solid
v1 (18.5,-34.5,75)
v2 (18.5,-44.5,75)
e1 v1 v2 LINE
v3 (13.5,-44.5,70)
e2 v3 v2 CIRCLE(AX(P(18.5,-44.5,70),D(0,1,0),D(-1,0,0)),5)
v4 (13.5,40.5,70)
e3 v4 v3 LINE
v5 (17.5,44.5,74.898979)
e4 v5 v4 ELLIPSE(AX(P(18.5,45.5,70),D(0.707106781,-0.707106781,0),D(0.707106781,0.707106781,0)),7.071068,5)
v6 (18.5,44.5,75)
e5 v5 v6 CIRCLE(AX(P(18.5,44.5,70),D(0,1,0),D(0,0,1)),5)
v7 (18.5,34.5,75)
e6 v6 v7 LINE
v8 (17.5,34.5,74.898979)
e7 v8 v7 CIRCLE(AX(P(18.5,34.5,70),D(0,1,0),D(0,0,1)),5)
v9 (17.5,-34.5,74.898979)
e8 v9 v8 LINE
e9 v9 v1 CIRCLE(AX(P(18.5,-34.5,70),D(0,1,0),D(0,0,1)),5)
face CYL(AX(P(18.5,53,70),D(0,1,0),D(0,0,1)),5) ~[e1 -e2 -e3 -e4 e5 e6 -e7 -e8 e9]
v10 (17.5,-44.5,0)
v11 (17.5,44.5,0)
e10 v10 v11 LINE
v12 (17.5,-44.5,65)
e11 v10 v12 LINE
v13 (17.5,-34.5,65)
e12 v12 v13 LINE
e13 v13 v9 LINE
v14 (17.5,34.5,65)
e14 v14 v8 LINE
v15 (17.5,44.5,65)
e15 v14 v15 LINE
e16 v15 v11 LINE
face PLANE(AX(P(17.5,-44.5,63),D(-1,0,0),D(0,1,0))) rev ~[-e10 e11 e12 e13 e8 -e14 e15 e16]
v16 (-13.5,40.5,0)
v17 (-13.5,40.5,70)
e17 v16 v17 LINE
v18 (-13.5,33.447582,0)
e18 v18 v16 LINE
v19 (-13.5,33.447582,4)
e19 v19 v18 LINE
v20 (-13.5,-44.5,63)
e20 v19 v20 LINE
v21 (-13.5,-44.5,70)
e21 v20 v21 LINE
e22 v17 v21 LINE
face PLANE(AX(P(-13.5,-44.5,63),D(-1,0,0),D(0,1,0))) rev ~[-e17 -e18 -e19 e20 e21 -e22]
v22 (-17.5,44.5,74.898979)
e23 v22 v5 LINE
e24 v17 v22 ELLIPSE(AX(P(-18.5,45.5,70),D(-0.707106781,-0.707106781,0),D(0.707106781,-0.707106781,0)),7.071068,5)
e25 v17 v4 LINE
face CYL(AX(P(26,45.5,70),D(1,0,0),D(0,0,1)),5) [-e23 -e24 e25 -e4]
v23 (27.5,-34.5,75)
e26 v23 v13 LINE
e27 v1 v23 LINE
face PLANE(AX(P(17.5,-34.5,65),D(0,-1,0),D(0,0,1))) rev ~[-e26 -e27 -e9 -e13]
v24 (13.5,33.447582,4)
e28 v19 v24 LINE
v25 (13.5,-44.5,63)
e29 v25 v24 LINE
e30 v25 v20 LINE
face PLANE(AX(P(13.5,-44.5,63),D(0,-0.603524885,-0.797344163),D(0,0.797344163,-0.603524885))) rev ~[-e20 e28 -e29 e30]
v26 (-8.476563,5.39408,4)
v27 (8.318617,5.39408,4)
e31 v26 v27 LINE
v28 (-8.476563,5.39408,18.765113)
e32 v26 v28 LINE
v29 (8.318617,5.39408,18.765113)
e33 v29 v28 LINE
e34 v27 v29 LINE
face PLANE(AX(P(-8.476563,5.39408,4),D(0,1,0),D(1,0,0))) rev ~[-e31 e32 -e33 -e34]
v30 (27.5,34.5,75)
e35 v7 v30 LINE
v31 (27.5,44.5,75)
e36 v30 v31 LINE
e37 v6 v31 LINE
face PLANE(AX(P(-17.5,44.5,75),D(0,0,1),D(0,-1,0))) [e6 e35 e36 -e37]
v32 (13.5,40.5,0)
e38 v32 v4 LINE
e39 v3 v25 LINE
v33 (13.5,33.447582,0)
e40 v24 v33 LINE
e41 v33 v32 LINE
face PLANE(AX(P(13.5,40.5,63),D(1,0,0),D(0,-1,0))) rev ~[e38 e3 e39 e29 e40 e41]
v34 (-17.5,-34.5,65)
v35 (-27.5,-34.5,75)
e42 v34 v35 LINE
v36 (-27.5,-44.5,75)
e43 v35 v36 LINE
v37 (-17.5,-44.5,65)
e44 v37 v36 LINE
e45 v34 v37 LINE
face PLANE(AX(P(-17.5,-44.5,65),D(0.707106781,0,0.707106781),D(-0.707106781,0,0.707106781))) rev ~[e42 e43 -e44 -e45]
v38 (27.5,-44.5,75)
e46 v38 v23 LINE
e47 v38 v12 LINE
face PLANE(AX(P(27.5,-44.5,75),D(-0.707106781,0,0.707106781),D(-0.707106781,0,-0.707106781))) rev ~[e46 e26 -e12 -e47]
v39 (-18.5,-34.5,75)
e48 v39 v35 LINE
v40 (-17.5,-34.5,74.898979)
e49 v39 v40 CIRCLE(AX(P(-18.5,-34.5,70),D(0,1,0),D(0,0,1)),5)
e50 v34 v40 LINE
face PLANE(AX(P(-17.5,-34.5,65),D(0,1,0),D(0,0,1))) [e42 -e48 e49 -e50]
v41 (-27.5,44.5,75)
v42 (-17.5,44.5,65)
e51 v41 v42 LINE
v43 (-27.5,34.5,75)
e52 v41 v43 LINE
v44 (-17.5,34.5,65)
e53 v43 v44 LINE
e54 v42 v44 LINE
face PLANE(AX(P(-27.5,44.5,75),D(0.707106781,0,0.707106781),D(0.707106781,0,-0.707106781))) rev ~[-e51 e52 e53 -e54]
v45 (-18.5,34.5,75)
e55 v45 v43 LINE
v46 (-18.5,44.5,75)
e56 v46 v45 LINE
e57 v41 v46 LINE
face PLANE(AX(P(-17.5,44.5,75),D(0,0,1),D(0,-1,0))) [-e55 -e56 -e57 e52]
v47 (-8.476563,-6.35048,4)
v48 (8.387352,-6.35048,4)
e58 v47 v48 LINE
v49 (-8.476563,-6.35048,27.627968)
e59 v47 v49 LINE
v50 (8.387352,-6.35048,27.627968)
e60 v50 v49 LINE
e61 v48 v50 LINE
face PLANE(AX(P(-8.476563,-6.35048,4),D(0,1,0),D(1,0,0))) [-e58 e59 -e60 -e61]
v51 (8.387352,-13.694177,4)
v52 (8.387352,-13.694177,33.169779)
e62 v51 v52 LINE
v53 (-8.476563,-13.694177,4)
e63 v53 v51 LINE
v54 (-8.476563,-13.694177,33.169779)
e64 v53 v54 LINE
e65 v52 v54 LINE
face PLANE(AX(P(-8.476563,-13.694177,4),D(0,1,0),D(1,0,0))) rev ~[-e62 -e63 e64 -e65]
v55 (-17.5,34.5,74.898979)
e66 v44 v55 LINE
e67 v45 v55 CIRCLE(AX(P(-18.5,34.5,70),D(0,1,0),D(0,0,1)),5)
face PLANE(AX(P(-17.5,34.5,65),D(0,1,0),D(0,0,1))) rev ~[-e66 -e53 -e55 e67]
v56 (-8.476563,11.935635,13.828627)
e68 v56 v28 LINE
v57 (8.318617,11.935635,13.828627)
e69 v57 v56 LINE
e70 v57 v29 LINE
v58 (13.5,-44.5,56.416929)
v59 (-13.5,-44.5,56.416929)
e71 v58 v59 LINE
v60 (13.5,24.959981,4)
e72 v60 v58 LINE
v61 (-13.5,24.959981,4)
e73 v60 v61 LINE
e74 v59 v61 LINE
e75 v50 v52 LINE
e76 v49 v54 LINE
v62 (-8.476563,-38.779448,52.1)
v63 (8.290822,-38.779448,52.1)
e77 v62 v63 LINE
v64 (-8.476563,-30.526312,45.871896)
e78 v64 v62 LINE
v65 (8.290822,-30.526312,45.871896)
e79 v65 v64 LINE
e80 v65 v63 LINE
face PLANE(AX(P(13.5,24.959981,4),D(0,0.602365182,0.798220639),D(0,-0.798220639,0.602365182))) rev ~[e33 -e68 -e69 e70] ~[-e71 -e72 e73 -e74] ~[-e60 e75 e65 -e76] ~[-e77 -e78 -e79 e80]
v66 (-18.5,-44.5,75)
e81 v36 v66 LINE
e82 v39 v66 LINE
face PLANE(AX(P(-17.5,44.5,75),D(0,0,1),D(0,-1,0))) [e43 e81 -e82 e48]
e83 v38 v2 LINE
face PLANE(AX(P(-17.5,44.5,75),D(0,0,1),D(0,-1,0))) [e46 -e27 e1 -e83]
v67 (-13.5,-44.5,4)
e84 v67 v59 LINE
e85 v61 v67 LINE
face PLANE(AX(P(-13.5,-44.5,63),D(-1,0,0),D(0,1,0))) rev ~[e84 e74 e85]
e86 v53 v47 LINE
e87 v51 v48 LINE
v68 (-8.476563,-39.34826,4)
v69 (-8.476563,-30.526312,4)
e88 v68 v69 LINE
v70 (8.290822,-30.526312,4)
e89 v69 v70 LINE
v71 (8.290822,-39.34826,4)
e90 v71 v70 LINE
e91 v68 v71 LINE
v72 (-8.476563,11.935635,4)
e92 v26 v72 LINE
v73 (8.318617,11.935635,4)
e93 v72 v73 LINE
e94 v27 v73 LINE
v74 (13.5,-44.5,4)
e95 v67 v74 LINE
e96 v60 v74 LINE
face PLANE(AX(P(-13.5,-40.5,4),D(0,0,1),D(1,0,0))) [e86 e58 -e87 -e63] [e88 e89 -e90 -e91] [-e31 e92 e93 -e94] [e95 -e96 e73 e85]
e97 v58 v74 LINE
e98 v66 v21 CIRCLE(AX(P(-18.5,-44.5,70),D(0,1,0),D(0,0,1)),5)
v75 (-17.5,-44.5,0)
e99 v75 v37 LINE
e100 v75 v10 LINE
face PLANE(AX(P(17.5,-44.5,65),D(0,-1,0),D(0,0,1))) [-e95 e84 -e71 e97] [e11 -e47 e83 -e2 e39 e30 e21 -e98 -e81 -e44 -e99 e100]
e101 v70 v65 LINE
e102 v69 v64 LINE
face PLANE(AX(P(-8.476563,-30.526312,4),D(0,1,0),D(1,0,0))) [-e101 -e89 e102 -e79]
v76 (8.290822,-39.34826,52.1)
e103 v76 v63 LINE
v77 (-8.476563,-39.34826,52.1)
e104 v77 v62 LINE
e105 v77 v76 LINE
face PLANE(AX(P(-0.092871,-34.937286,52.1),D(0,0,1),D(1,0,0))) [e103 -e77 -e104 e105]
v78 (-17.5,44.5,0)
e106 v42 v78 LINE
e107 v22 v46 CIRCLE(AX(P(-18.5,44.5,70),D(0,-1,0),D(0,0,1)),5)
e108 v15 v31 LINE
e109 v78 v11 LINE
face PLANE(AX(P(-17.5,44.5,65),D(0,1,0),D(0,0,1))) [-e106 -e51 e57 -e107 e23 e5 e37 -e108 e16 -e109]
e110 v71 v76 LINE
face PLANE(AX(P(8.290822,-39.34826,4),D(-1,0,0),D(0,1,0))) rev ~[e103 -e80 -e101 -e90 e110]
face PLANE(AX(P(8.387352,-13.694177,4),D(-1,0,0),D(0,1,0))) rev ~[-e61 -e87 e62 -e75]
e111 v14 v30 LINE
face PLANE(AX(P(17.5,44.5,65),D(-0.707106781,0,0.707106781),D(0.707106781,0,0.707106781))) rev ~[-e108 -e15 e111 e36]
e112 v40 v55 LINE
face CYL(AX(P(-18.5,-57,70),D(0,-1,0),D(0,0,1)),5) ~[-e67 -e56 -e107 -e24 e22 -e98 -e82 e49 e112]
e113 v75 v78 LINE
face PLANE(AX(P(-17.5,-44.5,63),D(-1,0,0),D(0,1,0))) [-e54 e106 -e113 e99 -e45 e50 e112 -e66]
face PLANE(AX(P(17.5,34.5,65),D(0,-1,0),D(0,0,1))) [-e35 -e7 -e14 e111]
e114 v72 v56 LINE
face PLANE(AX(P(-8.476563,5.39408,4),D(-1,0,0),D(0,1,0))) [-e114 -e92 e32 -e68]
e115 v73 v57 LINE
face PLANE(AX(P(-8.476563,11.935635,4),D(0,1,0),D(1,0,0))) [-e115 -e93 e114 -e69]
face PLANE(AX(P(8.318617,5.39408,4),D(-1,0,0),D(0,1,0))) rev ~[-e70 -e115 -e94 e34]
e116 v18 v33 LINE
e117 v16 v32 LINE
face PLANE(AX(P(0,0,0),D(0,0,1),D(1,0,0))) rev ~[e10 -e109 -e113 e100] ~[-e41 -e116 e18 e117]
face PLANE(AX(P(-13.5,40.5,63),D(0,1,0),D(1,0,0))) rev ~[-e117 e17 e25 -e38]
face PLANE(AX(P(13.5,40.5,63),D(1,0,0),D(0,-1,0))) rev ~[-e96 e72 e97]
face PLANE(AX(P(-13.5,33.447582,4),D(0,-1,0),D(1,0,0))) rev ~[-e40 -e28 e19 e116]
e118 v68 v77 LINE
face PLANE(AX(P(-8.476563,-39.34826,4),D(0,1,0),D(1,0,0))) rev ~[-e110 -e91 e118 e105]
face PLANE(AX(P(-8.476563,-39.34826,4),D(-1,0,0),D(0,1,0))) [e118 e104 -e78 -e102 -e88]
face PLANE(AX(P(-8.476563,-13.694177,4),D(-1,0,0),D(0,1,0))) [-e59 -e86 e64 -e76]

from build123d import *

# Parameters (mm, degrees)
F0_W          = 35
F0_H          = 89
F1_DEPTH      = 63
F2_T          = -4
F3_W          = 27
F3_H          = 7.0524177253
F4_DEPTH      = 4.3
F5_DEPTH      = 5.2
F7_DEPTH      = 12
F9_DEPTH      = 28.5
F8_W          = 16.7951798066
F8_H          = 6.5415552817
F10_DEPTH     = 15.6
F8_W_2        = 16.8639151379
F8_H_2        = 7.3436973616
F11_DEPTH     = 29.2
F8_W_3        = 16.7673844844
F8_H_3        = 8.8219475001
F12_DEPTH     = 48.1
F13_W         = 10
F13_H         = 10
F14_DEPTH     = 10
F15_W         = 10
F15_H         = 10
F16_DEPTH     = 10
F19_DEPTH     = 10
F20_DEPTH     = 10
F21_T1_DEPTH  = 97.5
F21_T3_DEPTH  = 27
F21_T8_DEPTH  = 94
F21_T13_DEPTH = 110
F21_T18_DEPTH = 110
F21_T23_DEPTH = 94
F21_T29_DEPTH = 97.5
F21_T35_DEPTH = 39.5
F21_T44_DEPTH = 39.5
F21_T50_DEPTH = 97.5


# Not quite as in the source:
# - a fillet or chamfer that OpenCascade refuses, or shapes differently, is made with other operations: its cross-section is extruded or revolved along the edge and cut away or added


with BuildPart() as f1:
    # F0 (on Top) → F1 (new body)
    with BuildSketch(Plane.XY):
        Rectangle(F0_W, F0_H)
    extrude(amount=F1_DEPTH)

    # F2
    f2_openings = [f1.faces().sort_by_distance(p)[0] for p in [
        (0, 0, 63),
    ]]
    offset(amount=F2_T, openings=f2_openings)

    # F3 (on face) → F4 (cut)
    with BuildSketch(Plane.XY.offset(4)):
        with Locations((0, 36.9737911373)):
            Rectangle(F3_W, F3_H)
    extrude(amount=-F4_DEPTH, mode=Mode.SUBTRACT)

    # F5 (cut): a face of the model
    f5_faces = [f1.faces().sort_by_distance(p)[0] for p in [
        (0, -40.5, 33.5),
    ]]
    extrude(f5_faces, amount=-F5_DEPTH, mode=Mode.SUBTRACT)

    # F7 (add): a face of the model
    f7_faces = [f1.faces().sort_by_distance(p)[0] for p in [
        (-16.5436527827, 0, 63),
    ]]
    extrude(f7_faces, amount=F7_DEPTH)

    # F6 (on face) → F9 (join)
    with BuildSketch(Plane(origin=(13.5, 0, 0), x_dir=(0, -1, 0), z_dir=(-1, 0, 0))):
        Polygon((44.5, 63), (-33.4475822747, 4), (-24.9599814415, 4), (44.5, 56.4169287682), align=None)
    extrude(amount=F9_DEPTH)

    # F8 (on face) → F10 (join)
    with BuildSketch(Plane.XY.offset(4)):
        with Locations((-0.0789728947, 8.664857829)):
            Rectangle(F8_W, F8_H)
    extrude(amount=F10_DEPTH)

    # F8 (on face) → F11 (join)
    with BuildSketch(Plane.XY.offset(4)):
        with Locations((-0.044605229, -10.0223287009)):
            Rectangle(F8_W_2, F8_H_2)
    extrude(amount=F11_DEPTH)

    # F8 (on face) → F12 (join)
    with BuildSketch(Plane.XY.offset(4)):
        with Locations((-0.0928705558, -34.9372858182)):
            Rectangle(F8_W_3, F8_H_3)
    extrude(amount=F12_DEPTH)

    # F13 (on face) → F14 (join)
    with BuildSketch(Plane.YZ.offset(17.5)):
        with Locations((-39.5, 70)):
            Rectangle(F13_W, F13_H)
        with Locations((39.5, 70)):
            Rectangle(F13_W, F13_H)
    extrude(amount=F14_DEPTH)

    # F15 (on face) → F16 (join)
    with BuildSketch(Plane(origin=(-17.5, 0, 0), x_dir=(0, -1, 0), z_dir=(-1, 0, 0))):
        with Locations((-39.5, 70)):
            Rectangle(F15_W, F15_H)
        with Locations((39.5, 70)):
            Rectangle(F15_W, F15_H)
    extrude(amount=F16_DEPTH)

    # F18 (on face) → F19 (cut)
    with BuildSketch(Plane.XZ.offset(44.5)):
        Polygon((-17.5, 65), (-27.5, 75), (-27.5, 65), align=None)
        Polygon((27.5, 75), (17.5, 65), (27.5, 65), align=None)
    extrude(amount=-F19_DEPTH, mode=Mode.SUBTRACT)

    # F17 (on face) → F20 (cut)
    with BuildSketch(Plane(origin=(0, 44.5, 0), x_dir=(-1, 0, 0), z_dir=(0, 1, 0))):
        Polygon((-17.5, 65), (-27.5, 75), (-27.5, 65), align=None)
        Polygon((27.5, 65), (27.5, 75), (17.5, 65), align=None)
    extrude(amount=-F20_DEPTH, mode=Mode.SUBTRACT)

    # F21: fillet of radius 5 on 7 edges, made by hand

    # F21_s2 → F21_t1 (cut)
    with BuildSketch(Plane.XZ.offset(-40.5)):
        with BuildLine():
            ThreePointArc((-18.5, 75), (-14.9644660941, 73.5355339059), (-13.5, 70))
            Line((-13.5, 70), (-13.5, 75))
            Line((-13.5, 75), (-18.5, 75))
        make_face()
        with BuildLine():
            ThreePointArc((18.5, 75), (14.9644660941, 73.5355339059), (13.5, 70))
            Line((13.5, 70), (13.5, 75))
            Line((13.5, 75), (18.5, 75))
        make_face()
    extrude(amount=F21_T1_DEPTH, mode=Mode.SUBTRACT)

    # F21_s4 → F21_t3 (cut)
    with BuildSketch(Plane.YZ.offset(-13.5)):
        with BuildLine():
            ThreePointArc((45.5, 75), (41.9644660941, 73.5355339059), (40.5, 70))
            Line((40.5, 70), (40.5, 75))
            Line((40.5, 75), (45.5, 75))
        make_face()
    extrude(amount=F21_T3_DEPTH, mode=Mode.SUBTRACT)


with BuildPart() as f21_tool6:
    # F21_s7 → F21_t8 (new body)
    with BuildSketch(Plane.XZ.offset(-47)):
        with BuildLine():
            ThreePointArc((-12.5, 75), (-16.0355339059, 73.5355339059), (-17.5, 70))
            Line((-17.5, 70), (-17.5, 75))
            Line((-17.5, 75), (-12.5, 75))
        make_face()
    extrude(amount=F21_T8_DEPTH)

    split(bisect_by=Plane.YZ.offset(-13.5), keep=Keep.TOP)


with BuildPart() as f1_1:
    add(f1.part)

    # F21_t5: cut F21_tool6
    add(f21_tool6.part, mode=Mode.SUBTRACT)


with BuildPart() as f21_tool11:
    # F21_s12 → F21_t13 (new body)
    with BuildSketch(Plane.XZ.offset(57)):
        with BuildLine():
            ThreePointArc((-18.5, 75), (-14.9644660941, 73.5355339059), (-13.5, 70))
            Line((-13.5, 70), (-13.5, 75))
            Line((-13.5, 75), (-18.5, 75))
        make_face()
    extrude(amount=-F21_T13_DEPTH)

    split(bisect_by=Plane.YZ.offset(-17.5), keep=Keep.BOTTOM)


with BuildPart() as f1_2:
    add(f1_1.part)

    # F21_t10: cut F21_tool11
    add(f21_tool11.part, mode=Mode.SUBTRACT)


with BuildPart() as f21_tool16:
    # F21_s17 → F21_t18 (new body)
    with BuildSketch(Plane.XZ.offset(-53)):
        with BuildLine():
            ThreePointArc((18.5, 75), (14.9644660941, 73.5355339059), (13.5, 70))
            Line((13.5, 70), (13.5, 75))
            Line((13.5, 75), (18.5, 75))
        make_face()
    extrude(amount=F21_T18_DEPTH)

    split(bisect_by=Plane.YZ.offset(17.5), keep=Keep.TOP)


with BuildPart() as f1_3:
    add(f1_2.part)

    # F21_t15: cut F21_tool16
    add(f21_tool16.part, mode=Mode.SUBTRACT)


with BuildPart() as f21_tool21:
    # F21_s22 → F21_t23 (new body)
    with BuildSketch(Plane.XZ.offset(47)):
        with BuildLine():
            ThreePointArc((17.5, 70), (16.0355339059, 73.5355339059), (12.5, 75))
            Line((12.5, 75), (17.5, 75))
            Line((17.5, 75), (17.5, 70))
        make_face()
    extrude(amount=-F21_T23_DEPTH)

    split(bisect_by=Plane.YZ.offset(13.5), keep=Keep.BOTTOM)


with BuildPart() as f1_4:
    add(f1_3.part)

    # F21_t20: cut F21_tool21
    add(f21_tool21.part, mode=Mode.SUBTRACT)


with BuildPart() as f21_tool27:
    # F21_s28 → F21_t29 (new body)
    with BuildSketch(Plane.XZ.offset(44.5)):
        with BuildLine():
            ThreePointArc((-18.5, 75), (-14.9644660941, 73.5355339059), (-13.5, 70))
            Line((-13.5, 70), (-13.5, 75))
            Line((-13.5, 75), (-18.5, 75))
        make_face()
    extrude(amount=-F21_T29_DEPTH)

    split(bisect_by=Plane.YZ.offset(-17.5), keep=Keep.TOP)

    split(bisect_by=Plane.XZ.offset(-44.5), keep=Keep.TOP)

    split(bisect_by=Plane.XZ.offset(-40.5), keep=Keep.BOTTOM)


with BuildPart() as f21_tool33:
    # F21_s34 → F21_t35 (new body)
    with BuildSketch(Plane.YZ.offset(13.5)):
        with BuildLine():
            ThreePointArc((45.5, 75), (41.9644660941, 73.5355339059), (40.5, 70))
            Line((40.5, 70), (40.5, 75))
            Line((40.5, 75), (45.5, 75))
        make_face()
    extrude(amount=-F21_T35_DEPTH)

    split(bisect_by=Plane.YZ.offset(-13.5), keep=Keep.BOTTOM)

    split(bisect_by=Plane.XZ.offset(-44.5), keep=Keep.TOP)

    split(bisect_by=Plane(origin=(23.75, 0, 23.75), x_dir=(0, 1, 0), z_dir=(0.7071067812, 0, 0.7071067812)), keep=Keep.TOP)


with BuildPart() as f21_tool27_1:
    add(f21_tool27.part)

    # F21_t39: intersect F21_tool33
    add(f21_tool33.part, mode=Mode.INTERSECT)


with BuildPart() as f1_5:
    add(f1_4.part)

    # F21_t25: cut F21_tool27
    add(f21_tool27_1.part, mode=Mode.SUBTRACT)


with BuildPart() as f21_tool42:
    # F21_s43 → F21_t44 (new body)
    with BuildSketch(Plane.YZ.offset(26)):
        with BuildLine():
            ThreePointArc((45.5, 75), (41.9644660941, 73.5355339059), (40.5, 70))
            Line((40.5, 70), (40.5, 75))
            Line((40.5, 75), (45.5, 75))
        make_face()
    extrude(amount=-F21_T44_DEPTH)

    split(bisect_by=Plane.YZ.offset(13.5), keep=Keep.TOP)

    split(bisect_by=Plane.XZ.offset(-44.5), keep=Keep.TOP)

    split(bisect_by=Plane(origin=(-23.75, 0, 23.75), x_dir=(0, 1, 0), z_dir=(-0.7071067812, 0, 0.7071067812)), keep=Keep.TOP)


with BuildPart() as f21_tool48:
    # F21_s49 → F21_t50 (new body)
    with BuildSketch(Plane.XZ.offset(-53)):
        with BuildLine():
            ThreePointArc((18.5, 75), (14.9644660941, 73.5355339059), (13.5, 70))
            Line((13.5, 70), (13.5, 75))
            Line((13.5, 75), (18.5, 75))
        make_face()
    extrude(amount=F21_T50_DEPTH)

    split(bisect_by=Plane.YZ.offset(17.5), keep=Keep.BOTTOM)

    split(bisect_by=Plane.XZ.offset(-44.5), keep=Keep.TOP)

    split(bisect_by=Plane.XZ.offset(-40.5), keep=Keep.BOTTOM)


with BuildPart() as f21_tool42_1:
    add(f21_tool42.part)

    # F21_t54: intersect F21_tool48
    add(f21_tool48.part, mode=Mode.INTERSECT)


with BuildPart() as f1_6:
    add(f1_5.part)

    # F21_t40: cut F21_tool42
    add(f21_tool42_1.part, mode=Mode.SUBTRACT)


solid = f1_6.part
